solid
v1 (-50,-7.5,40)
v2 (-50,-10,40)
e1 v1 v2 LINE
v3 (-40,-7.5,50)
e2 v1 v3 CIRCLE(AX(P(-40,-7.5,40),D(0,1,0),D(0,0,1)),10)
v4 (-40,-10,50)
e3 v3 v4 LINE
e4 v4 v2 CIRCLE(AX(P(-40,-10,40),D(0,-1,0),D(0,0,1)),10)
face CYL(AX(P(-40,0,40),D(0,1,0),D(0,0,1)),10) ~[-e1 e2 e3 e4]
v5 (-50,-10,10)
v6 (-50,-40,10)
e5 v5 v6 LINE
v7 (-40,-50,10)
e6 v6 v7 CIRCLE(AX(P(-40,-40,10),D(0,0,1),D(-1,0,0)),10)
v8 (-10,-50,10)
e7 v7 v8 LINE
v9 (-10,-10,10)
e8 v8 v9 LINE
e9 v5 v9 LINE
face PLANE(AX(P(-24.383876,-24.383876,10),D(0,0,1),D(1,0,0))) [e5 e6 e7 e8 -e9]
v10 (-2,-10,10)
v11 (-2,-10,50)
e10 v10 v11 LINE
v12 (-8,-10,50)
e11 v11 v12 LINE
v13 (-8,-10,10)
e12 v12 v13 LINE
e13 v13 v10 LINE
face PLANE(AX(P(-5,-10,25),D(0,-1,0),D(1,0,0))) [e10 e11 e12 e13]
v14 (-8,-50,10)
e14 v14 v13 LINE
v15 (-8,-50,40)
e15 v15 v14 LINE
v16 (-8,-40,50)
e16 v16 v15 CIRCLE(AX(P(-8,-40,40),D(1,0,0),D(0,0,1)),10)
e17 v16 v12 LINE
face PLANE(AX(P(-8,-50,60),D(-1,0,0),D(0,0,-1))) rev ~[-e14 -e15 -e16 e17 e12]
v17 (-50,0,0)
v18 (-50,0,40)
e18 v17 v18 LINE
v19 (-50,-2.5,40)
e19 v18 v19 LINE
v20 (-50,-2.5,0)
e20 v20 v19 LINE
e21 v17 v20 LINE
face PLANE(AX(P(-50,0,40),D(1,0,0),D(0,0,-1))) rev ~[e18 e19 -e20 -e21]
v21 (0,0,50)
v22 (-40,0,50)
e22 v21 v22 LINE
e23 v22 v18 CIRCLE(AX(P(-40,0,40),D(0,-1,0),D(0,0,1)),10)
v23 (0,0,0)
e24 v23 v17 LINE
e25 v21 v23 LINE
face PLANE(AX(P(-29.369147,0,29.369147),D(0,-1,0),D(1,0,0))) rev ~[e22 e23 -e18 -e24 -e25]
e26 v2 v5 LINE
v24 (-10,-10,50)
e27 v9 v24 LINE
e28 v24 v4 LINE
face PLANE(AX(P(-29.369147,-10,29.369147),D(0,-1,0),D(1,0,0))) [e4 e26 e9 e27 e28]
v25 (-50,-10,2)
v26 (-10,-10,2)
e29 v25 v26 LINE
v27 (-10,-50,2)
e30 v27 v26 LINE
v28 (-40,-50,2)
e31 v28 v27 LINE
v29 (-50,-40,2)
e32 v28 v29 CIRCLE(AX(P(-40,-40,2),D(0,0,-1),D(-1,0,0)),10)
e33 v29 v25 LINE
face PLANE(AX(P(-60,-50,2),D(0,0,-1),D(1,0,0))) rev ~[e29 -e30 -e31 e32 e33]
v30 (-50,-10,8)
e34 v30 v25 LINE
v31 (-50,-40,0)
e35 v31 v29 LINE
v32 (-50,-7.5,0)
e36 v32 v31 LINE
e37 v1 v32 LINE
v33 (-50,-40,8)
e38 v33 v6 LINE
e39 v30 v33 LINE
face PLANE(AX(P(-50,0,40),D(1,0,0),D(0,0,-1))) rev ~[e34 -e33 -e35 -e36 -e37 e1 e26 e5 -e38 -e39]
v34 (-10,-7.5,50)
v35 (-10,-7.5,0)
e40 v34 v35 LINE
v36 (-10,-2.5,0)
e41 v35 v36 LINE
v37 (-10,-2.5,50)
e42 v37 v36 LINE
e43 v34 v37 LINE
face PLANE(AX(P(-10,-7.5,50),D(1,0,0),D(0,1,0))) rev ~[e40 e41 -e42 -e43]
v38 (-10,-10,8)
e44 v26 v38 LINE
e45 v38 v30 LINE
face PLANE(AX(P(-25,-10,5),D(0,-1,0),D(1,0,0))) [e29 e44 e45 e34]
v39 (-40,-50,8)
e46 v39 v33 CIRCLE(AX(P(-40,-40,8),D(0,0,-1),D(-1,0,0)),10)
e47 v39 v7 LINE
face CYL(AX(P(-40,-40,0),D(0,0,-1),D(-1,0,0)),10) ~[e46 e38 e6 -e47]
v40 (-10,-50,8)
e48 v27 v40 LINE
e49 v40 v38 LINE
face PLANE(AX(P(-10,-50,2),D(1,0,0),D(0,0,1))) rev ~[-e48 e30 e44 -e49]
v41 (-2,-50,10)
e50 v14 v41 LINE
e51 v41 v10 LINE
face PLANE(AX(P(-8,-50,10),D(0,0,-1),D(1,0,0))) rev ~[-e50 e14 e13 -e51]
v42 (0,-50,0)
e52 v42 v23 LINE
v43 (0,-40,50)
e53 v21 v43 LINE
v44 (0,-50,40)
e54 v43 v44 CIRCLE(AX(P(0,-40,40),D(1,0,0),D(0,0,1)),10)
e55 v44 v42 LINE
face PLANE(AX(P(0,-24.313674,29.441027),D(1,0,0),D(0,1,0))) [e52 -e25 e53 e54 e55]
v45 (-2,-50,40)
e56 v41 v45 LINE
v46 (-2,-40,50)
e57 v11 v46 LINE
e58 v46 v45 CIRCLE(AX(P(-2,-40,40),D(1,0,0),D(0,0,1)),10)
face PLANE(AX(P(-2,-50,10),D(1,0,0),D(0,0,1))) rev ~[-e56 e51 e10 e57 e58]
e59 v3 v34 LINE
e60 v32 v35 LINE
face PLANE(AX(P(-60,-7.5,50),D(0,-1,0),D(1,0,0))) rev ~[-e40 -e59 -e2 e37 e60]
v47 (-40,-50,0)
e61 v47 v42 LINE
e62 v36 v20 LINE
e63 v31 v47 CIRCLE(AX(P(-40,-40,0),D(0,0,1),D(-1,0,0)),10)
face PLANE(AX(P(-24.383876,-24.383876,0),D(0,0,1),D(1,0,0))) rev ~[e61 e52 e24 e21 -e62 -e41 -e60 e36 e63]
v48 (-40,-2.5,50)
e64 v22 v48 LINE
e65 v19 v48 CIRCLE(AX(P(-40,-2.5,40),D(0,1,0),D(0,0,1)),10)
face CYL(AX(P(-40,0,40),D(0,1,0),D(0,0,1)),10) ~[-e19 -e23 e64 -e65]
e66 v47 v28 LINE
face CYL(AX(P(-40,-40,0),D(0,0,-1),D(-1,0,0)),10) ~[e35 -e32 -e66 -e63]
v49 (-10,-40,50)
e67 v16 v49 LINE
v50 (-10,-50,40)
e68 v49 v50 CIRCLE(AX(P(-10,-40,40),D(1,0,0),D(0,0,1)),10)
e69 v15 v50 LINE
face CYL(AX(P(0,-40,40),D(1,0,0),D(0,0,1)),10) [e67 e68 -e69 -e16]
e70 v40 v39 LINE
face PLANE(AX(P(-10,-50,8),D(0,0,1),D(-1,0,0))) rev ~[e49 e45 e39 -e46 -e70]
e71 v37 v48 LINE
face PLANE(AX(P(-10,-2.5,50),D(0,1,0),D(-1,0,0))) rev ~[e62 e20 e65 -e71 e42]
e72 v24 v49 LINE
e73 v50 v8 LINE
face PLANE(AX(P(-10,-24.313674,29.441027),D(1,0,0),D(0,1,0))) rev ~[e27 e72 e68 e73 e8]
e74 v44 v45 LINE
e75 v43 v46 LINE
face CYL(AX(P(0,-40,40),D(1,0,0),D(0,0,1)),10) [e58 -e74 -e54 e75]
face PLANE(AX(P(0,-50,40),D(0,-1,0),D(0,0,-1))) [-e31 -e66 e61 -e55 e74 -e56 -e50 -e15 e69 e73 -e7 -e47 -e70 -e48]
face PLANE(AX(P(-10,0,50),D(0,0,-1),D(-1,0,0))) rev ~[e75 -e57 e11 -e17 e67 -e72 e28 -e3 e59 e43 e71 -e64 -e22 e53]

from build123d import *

# Parameters (mm, degrees)
F1_DEPTH = 10
F3_DEPTH = 10
F5_DEPTH = 10
F6_W     = 20
F6_H     = 6
F6_W_2   = 6
F6_H_2   = 30
F6_H_3   = 20
F7_DEPTH = 40
F8_W     = 30
F8_H     = 5
F8_W_2   = 20
F9_DEPTH = 50.001


# Not quite as in the source:
# - a feature names something its author has since deleted; it is built from what else it names


with BuildPart() as f1:
    # F0 (on Top) → F1 (new body)
    with BuildSketch(Plane.XY):
        with BuildLine():
            Line((0, -50), (0, 0))
            Line((0, 0), (-50, 0))
            Line((-50, 0), (-50, -40))
            ThreePointArc((-50, -40), (-47.0710678119, -47.0710678119), (-40, -50))
            Line((-40, -50), (0, -50))
        make_face()
    extrude(amount=F1_DEPTH)

    # F2 (on Right) → F3 (join)
    with BuildSketch(Plane.YZ):
        with BuildLine():
            Line((-50, 10), (0, 10))
            Line((0, 10), (0, 50))
            Line((0, 50), (-40, 50))
            ThreePointArc((-40, 50), (-47.0710678119, 47.0710678119), (-50, 40))
            Line((-50, 40), (-50, 10))
        make_face()
    extrude(amount=-F3_DEPTH)

    # F4 (on Front) → F5 (join)
    with BuildSketch(Plane.XZ):
        with BuildLine():
            Line((-50, 10), (-10, 10))
            Line((-10, 10), (-10, 50))
            Line((-10, 50), (-40, 50))
            ThreePointArc((-40, 50), (-47.0710678119, 47.0710678119), (-50, 40))
            Line((-50, 40), (-50, 10))
        make_face()
    extrude(amount=F5_DEPTH)

    # F6 (on face) → F7 (cut)
    with BuildSketch(Plane.XZ.offset(50)):
        Polygon((-15, 2), (-10, 2), (-10, 8), (-40, 8), (-40, 2), align=None)
        with Locations((-50, 5)):
            Rectangle(F6_W, F6_H)
        with Locations((-5, 25)):
            Rectangle(F6_W_2, F6_H_2)
        with Locations((-5, 50)):
            Rectangle(F6_W_2, F6_H_3)
    extrude(amount=-F7_DEPTH, mode=Mode.SUBTRACT)

    # F8 (on face) → F9 (cut, through all)
    with BuildSketch(Plane.XY.offset(50)):
        with Locations((-25, -5)):
            Rectangle(F8_W, F8_H)
        with Locations((-50, -5)):
            Rectangle(F8_W_2, F8_H)
    extrude(amount=-F9_DEPTH, mode=Mode.SUBTRACT)


solid = f1.part
